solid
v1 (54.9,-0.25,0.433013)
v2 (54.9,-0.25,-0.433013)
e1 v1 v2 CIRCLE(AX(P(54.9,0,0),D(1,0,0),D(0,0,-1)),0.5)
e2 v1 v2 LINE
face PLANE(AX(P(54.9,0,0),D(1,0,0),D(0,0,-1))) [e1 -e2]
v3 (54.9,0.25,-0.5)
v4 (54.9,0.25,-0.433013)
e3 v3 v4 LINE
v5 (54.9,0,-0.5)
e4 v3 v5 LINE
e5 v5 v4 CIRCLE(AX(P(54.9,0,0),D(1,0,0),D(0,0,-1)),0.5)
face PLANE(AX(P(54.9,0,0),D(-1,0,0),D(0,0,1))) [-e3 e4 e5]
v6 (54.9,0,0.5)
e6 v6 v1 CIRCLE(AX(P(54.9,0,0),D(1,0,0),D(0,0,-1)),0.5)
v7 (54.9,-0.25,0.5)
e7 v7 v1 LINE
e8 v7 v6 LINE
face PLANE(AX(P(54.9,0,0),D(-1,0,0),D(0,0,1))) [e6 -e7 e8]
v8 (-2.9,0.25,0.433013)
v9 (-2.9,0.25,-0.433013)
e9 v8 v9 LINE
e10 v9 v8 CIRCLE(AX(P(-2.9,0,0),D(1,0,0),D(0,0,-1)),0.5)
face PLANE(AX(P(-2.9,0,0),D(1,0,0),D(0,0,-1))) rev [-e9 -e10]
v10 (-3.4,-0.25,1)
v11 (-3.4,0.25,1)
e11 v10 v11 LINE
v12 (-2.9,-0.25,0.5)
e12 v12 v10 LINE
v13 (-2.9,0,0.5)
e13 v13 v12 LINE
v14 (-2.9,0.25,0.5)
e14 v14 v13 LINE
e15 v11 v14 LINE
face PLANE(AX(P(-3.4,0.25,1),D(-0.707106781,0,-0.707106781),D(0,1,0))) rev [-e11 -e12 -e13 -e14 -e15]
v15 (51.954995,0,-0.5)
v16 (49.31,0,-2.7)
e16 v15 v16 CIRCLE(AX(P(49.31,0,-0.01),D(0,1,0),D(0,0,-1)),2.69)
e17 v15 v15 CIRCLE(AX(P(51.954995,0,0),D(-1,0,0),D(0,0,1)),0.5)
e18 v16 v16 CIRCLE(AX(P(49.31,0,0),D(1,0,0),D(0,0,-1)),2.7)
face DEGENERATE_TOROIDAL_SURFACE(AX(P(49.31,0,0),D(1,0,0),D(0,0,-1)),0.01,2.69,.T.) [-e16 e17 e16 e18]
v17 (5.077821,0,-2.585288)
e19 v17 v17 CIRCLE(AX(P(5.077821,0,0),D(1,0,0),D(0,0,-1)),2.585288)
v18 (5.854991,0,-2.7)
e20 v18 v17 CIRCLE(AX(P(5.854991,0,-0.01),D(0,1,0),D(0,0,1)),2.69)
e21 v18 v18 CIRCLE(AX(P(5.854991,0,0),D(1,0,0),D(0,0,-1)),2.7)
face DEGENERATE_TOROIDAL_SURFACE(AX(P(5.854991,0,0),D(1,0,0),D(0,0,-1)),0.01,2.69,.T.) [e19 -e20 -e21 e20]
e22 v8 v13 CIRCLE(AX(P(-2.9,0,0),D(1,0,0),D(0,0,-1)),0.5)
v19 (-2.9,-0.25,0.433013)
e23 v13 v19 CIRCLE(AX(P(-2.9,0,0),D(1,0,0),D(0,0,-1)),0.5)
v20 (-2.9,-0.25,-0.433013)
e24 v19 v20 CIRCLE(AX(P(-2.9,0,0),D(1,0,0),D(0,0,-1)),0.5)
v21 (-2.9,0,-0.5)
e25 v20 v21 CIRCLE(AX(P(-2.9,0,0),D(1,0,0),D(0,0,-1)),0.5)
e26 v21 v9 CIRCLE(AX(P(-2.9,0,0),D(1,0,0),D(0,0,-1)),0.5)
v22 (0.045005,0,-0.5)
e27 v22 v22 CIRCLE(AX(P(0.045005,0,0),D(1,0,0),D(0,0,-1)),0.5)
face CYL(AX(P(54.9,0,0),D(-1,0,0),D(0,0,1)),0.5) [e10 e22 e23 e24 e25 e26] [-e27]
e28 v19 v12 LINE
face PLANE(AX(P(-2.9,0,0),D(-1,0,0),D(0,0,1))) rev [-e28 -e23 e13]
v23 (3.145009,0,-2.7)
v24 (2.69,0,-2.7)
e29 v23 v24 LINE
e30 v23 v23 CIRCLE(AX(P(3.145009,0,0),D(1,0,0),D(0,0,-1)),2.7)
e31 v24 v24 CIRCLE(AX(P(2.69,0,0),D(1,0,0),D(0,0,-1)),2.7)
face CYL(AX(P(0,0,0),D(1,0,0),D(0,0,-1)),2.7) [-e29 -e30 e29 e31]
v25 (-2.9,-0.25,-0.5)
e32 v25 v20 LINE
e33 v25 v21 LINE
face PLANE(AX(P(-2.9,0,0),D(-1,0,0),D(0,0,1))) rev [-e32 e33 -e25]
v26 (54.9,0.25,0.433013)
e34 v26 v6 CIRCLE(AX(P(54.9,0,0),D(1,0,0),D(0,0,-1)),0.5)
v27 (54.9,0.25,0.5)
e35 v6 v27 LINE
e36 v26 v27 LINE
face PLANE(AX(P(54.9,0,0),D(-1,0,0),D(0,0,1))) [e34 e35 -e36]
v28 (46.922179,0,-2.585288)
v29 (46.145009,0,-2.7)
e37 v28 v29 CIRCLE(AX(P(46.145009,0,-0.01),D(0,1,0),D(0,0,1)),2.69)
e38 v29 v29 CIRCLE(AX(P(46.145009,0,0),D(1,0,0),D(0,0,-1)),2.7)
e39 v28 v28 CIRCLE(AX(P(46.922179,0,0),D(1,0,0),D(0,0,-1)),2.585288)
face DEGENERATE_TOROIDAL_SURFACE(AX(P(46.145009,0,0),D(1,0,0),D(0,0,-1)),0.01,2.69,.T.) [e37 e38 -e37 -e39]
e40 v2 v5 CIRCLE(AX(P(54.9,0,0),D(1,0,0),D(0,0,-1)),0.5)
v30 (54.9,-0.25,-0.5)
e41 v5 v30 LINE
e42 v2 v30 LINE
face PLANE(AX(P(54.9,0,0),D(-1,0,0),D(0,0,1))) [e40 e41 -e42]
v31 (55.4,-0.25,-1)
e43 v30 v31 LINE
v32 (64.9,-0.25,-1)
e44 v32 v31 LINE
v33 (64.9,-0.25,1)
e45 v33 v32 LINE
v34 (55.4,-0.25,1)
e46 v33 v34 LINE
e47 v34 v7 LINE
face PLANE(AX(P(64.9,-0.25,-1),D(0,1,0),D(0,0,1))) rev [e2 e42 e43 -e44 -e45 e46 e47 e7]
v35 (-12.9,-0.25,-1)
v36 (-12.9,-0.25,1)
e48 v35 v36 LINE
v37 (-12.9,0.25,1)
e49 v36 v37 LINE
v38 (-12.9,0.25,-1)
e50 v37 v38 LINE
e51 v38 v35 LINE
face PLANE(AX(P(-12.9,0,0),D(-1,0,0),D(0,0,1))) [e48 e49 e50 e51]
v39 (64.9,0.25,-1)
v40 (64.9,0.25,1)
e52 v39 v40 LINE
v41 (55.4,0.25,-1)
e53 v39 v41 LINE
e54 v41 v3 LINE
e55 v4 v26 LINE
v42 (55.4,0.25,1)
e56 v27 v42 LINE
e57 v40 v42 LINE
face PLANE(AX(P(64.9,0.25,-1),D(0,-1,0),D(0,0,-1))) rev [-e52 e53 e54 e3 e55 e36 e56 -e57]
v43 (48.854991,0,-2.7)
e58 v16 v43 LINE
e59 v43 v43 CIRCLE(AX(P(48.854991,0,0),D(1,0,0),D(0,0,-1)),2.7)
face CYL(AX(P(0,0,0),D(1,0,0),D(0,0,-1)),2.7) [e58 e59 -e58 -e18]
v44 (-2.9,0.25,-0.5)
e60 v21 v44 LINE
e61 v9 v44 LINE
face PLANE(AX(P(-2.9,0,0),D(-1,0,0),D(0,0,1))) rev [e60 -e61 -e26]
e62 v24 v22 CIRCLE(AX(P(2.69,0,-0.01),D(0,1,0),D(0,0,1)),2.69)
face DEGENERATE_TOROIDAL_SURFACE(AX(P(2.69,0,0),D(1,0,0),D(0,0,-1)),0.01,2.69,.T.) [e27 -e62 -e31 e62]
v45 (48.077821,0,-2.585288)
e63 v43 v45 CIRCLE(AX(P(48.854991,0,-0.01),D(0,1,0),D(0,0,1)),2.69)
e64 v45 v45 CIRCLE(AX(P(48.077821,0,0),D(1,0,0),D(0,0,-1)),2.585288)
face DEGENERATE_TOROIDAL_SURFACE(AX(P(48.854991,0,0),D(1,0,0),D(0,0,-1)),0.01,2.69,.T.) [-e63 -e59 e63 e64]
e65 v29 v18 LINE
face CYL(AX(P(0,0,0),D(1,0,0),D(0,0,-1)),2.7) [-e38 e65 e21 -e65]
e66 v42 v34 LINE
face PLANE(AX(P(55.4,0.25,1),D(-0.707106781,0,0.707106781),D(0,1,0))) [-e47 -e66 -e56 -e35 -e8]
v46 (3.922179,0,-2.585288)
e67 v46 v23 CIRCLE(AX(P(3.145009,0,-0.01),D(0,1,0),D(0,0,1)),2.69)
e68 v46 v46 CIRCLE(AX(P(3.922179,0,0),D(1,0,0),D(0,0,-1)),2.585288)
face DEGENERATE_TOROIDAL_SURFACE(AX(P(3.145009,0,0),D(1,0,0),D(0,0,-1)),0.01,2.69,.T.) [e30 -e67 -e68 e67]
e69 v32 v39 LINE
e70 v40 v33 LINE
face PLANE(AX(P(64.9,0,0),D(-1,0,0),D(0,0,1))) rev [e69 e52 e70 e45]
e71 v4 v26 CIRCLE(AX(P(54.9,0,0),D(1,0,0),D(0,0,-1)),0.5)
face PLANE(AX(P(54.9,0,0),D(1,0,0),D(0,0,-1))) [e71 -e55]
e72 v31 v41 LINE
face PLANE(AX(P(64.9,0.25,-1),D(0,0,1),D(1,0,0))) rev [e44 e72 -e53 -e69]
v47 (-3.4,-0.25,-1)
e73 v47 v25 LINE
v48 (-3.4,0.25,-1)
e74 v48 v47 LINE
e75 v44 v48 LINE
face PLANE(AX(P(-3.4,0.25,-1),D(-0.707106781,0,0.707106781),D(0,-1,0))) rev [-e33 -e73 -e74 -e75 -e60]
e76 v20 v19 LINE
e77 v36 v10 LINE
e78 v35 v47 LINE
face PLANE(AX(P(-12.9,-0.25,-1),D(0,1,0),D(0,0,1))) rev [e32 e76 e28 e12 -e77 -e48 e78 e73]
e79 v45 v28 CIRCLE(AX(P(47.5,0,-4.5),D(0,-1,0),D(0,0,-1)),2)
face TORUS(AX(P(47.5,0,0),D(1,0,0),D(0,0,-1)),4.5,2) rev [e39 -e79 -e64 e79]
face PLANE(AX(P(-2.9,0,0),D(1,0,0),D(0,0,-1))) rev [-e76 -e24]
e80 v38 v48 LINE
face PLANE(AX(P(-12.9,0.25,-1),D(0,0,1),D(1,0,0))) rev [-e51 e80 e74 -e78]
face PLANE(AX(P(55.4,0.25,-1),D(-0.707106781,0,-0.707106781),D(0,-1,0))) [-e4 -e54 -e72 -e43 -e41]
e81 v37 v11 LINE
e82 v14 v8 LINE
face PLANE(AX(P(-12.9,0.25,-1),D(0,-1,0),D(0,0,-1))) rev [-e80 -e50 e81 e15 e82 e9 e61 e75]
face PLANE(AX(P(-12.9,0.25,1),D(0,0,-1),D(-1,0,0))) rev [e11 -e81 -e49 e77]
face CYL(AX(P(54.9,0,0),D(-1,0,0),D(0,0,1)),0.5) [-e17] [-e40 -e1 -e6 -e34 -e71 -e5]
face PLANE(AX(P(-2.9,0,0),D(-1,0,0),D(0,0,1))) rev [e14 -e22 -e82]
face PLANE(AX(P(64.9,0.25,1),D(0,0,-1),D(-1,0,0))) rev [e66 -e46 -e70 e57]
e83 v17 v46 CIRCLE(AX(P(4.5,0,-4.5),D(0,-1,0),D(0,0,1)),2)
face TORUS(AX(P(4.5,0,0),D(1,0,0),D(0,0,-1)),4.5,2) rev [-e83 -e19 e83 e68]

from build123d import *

# Parameters (mm, degrees)
SKETCH_7_R      = 0.5
EXTRUDE_1_DEPTH = 57.8
SKETCH_8_W      = 2
SKETCH_8_H      = 0.5
EXTRUDE_2_DEPTH = 10
CHAMFER_1_SIZE  = 0.5
SKETCH_9_W      = 2
SKETCH_9_H      = 0.5
EXTRUDE_3_DEPTH = 10
CHAMFER_2_SIZE  = 0.5


with BuildPart() as part:
    # По траектории1: sweep along a path in Эскиз4
    with BuildLine(Plane(origin=(0, 0, 0), x_dir=(0, 0, -1), z_dir=(1, 0, 0))) as sweep_1_path:
        CenterArc((0, 0), 2.7, 0, 360)
    # Эскиз3 → По траектории1 (sweep)
    with BuildSketch(Plane(origin=(0, 0, 0), x_dir=(1, 0, 0), z_dir=(0, 1, 0))):
        with BuildLine():
            Line((48.854990775, 2.7), (49.31, 2.7))
            ThreePointArc((49.31, 2.7), (51.212117241, 1.912117241), (52, 0.01))
            Line((52, 0.01), (52, 0))
            Line((52, 0), (0, 0))
            Line((0, 0), (0, 0.01))
            ThreePointArc((0, 0.01), (0.787882759, 1.912117241), (2.69, 2.7))
            Line((2.69, 2.7), (3.145009225, 2.7))
            ThreePointArc((3.145009225, 2.7), (3.537804142, 2.671167442), (3.922178774, 2.585287846))
            ThreePointArc((3.922178774, 2.585287846), (4.5, 2.5), (5.077821226, 2.585287846))
            ThreePointArc((5.077821226, 2.585287846), (5.462195858, 2.671167442), (5.854990775, 2.7))
            Line((5.854990775, 2.7), (46.145009225, 2.7))
            ThreePointArc((46.145009225, 2.7), (46.537804142, 2.671167442), (46.922178774, 2.585287846))
            ThreePointArc((46.922178774, 2.585287846), (47.5, 2.5), (48.077821226, 2.585287846))
            ThreePointArc((48.077821226, 2.585287846), (48.462195858, 2.671167442), (48.854990775, 2.7))
        make_face()
    sweep(path=sweep_1_path.line)

    # Эскиз7 → Бобышка-Вытянуть1 (add)
    with BuildSketch(Plane(origin=(-2.9, 0, 0), x_dir=(0, 0, -1), z_dir=(1, 0, 0))):
        Circle(SKETCH_7_R)
    extrude(amount=EXTRUDE_1_DEPTH)

    # Эскиз8 → Бобышка-Вытянуть2 (add)
    with BuildSketch(Plane.ZY.offset(2.9)):
        Rectangle(SKETCH_8_W, SKETCH_8_H)
    extrude(amount=EXTRUDE_2_DEPTH)

    # Фаска1
    chamfer_1_edges = [part.edges().sort_by_distance(p)[0] for p in [
        (-2.9, 0, -1),
        (-2.9, 0, 1),
    ]]
    chamfer(chamfer_1_edges, length=CHAMFER_1_SIZE - 0.0001)  # a hair under: the kernel refuses the full size

    # Эскиз9 → Бобышка-Вытянуть3 (add)
    with BuildSketch(Plane(origin=(54.9, 0, 0), x_dir=(0, 0, -1), z_dir=(1, 0, 0))):
        Rectangle(SKETCH_9_W, SKETCH_9_H)
    extrude(amount=EXTRUDE_3_DEPTH)

    # Фаска2
    chamfer_2_edges = [part.edges().sort_by_distance(p)[0] for p in [
        (54.9, 0, -1),
        (54.9, 0, 1),
    ]]
    chamfer(chamfer_2_edges, length=CHAMFER_2_SIZE - 0.0001)  # a hair under: the kernel refuses the full size


solid = part.part
